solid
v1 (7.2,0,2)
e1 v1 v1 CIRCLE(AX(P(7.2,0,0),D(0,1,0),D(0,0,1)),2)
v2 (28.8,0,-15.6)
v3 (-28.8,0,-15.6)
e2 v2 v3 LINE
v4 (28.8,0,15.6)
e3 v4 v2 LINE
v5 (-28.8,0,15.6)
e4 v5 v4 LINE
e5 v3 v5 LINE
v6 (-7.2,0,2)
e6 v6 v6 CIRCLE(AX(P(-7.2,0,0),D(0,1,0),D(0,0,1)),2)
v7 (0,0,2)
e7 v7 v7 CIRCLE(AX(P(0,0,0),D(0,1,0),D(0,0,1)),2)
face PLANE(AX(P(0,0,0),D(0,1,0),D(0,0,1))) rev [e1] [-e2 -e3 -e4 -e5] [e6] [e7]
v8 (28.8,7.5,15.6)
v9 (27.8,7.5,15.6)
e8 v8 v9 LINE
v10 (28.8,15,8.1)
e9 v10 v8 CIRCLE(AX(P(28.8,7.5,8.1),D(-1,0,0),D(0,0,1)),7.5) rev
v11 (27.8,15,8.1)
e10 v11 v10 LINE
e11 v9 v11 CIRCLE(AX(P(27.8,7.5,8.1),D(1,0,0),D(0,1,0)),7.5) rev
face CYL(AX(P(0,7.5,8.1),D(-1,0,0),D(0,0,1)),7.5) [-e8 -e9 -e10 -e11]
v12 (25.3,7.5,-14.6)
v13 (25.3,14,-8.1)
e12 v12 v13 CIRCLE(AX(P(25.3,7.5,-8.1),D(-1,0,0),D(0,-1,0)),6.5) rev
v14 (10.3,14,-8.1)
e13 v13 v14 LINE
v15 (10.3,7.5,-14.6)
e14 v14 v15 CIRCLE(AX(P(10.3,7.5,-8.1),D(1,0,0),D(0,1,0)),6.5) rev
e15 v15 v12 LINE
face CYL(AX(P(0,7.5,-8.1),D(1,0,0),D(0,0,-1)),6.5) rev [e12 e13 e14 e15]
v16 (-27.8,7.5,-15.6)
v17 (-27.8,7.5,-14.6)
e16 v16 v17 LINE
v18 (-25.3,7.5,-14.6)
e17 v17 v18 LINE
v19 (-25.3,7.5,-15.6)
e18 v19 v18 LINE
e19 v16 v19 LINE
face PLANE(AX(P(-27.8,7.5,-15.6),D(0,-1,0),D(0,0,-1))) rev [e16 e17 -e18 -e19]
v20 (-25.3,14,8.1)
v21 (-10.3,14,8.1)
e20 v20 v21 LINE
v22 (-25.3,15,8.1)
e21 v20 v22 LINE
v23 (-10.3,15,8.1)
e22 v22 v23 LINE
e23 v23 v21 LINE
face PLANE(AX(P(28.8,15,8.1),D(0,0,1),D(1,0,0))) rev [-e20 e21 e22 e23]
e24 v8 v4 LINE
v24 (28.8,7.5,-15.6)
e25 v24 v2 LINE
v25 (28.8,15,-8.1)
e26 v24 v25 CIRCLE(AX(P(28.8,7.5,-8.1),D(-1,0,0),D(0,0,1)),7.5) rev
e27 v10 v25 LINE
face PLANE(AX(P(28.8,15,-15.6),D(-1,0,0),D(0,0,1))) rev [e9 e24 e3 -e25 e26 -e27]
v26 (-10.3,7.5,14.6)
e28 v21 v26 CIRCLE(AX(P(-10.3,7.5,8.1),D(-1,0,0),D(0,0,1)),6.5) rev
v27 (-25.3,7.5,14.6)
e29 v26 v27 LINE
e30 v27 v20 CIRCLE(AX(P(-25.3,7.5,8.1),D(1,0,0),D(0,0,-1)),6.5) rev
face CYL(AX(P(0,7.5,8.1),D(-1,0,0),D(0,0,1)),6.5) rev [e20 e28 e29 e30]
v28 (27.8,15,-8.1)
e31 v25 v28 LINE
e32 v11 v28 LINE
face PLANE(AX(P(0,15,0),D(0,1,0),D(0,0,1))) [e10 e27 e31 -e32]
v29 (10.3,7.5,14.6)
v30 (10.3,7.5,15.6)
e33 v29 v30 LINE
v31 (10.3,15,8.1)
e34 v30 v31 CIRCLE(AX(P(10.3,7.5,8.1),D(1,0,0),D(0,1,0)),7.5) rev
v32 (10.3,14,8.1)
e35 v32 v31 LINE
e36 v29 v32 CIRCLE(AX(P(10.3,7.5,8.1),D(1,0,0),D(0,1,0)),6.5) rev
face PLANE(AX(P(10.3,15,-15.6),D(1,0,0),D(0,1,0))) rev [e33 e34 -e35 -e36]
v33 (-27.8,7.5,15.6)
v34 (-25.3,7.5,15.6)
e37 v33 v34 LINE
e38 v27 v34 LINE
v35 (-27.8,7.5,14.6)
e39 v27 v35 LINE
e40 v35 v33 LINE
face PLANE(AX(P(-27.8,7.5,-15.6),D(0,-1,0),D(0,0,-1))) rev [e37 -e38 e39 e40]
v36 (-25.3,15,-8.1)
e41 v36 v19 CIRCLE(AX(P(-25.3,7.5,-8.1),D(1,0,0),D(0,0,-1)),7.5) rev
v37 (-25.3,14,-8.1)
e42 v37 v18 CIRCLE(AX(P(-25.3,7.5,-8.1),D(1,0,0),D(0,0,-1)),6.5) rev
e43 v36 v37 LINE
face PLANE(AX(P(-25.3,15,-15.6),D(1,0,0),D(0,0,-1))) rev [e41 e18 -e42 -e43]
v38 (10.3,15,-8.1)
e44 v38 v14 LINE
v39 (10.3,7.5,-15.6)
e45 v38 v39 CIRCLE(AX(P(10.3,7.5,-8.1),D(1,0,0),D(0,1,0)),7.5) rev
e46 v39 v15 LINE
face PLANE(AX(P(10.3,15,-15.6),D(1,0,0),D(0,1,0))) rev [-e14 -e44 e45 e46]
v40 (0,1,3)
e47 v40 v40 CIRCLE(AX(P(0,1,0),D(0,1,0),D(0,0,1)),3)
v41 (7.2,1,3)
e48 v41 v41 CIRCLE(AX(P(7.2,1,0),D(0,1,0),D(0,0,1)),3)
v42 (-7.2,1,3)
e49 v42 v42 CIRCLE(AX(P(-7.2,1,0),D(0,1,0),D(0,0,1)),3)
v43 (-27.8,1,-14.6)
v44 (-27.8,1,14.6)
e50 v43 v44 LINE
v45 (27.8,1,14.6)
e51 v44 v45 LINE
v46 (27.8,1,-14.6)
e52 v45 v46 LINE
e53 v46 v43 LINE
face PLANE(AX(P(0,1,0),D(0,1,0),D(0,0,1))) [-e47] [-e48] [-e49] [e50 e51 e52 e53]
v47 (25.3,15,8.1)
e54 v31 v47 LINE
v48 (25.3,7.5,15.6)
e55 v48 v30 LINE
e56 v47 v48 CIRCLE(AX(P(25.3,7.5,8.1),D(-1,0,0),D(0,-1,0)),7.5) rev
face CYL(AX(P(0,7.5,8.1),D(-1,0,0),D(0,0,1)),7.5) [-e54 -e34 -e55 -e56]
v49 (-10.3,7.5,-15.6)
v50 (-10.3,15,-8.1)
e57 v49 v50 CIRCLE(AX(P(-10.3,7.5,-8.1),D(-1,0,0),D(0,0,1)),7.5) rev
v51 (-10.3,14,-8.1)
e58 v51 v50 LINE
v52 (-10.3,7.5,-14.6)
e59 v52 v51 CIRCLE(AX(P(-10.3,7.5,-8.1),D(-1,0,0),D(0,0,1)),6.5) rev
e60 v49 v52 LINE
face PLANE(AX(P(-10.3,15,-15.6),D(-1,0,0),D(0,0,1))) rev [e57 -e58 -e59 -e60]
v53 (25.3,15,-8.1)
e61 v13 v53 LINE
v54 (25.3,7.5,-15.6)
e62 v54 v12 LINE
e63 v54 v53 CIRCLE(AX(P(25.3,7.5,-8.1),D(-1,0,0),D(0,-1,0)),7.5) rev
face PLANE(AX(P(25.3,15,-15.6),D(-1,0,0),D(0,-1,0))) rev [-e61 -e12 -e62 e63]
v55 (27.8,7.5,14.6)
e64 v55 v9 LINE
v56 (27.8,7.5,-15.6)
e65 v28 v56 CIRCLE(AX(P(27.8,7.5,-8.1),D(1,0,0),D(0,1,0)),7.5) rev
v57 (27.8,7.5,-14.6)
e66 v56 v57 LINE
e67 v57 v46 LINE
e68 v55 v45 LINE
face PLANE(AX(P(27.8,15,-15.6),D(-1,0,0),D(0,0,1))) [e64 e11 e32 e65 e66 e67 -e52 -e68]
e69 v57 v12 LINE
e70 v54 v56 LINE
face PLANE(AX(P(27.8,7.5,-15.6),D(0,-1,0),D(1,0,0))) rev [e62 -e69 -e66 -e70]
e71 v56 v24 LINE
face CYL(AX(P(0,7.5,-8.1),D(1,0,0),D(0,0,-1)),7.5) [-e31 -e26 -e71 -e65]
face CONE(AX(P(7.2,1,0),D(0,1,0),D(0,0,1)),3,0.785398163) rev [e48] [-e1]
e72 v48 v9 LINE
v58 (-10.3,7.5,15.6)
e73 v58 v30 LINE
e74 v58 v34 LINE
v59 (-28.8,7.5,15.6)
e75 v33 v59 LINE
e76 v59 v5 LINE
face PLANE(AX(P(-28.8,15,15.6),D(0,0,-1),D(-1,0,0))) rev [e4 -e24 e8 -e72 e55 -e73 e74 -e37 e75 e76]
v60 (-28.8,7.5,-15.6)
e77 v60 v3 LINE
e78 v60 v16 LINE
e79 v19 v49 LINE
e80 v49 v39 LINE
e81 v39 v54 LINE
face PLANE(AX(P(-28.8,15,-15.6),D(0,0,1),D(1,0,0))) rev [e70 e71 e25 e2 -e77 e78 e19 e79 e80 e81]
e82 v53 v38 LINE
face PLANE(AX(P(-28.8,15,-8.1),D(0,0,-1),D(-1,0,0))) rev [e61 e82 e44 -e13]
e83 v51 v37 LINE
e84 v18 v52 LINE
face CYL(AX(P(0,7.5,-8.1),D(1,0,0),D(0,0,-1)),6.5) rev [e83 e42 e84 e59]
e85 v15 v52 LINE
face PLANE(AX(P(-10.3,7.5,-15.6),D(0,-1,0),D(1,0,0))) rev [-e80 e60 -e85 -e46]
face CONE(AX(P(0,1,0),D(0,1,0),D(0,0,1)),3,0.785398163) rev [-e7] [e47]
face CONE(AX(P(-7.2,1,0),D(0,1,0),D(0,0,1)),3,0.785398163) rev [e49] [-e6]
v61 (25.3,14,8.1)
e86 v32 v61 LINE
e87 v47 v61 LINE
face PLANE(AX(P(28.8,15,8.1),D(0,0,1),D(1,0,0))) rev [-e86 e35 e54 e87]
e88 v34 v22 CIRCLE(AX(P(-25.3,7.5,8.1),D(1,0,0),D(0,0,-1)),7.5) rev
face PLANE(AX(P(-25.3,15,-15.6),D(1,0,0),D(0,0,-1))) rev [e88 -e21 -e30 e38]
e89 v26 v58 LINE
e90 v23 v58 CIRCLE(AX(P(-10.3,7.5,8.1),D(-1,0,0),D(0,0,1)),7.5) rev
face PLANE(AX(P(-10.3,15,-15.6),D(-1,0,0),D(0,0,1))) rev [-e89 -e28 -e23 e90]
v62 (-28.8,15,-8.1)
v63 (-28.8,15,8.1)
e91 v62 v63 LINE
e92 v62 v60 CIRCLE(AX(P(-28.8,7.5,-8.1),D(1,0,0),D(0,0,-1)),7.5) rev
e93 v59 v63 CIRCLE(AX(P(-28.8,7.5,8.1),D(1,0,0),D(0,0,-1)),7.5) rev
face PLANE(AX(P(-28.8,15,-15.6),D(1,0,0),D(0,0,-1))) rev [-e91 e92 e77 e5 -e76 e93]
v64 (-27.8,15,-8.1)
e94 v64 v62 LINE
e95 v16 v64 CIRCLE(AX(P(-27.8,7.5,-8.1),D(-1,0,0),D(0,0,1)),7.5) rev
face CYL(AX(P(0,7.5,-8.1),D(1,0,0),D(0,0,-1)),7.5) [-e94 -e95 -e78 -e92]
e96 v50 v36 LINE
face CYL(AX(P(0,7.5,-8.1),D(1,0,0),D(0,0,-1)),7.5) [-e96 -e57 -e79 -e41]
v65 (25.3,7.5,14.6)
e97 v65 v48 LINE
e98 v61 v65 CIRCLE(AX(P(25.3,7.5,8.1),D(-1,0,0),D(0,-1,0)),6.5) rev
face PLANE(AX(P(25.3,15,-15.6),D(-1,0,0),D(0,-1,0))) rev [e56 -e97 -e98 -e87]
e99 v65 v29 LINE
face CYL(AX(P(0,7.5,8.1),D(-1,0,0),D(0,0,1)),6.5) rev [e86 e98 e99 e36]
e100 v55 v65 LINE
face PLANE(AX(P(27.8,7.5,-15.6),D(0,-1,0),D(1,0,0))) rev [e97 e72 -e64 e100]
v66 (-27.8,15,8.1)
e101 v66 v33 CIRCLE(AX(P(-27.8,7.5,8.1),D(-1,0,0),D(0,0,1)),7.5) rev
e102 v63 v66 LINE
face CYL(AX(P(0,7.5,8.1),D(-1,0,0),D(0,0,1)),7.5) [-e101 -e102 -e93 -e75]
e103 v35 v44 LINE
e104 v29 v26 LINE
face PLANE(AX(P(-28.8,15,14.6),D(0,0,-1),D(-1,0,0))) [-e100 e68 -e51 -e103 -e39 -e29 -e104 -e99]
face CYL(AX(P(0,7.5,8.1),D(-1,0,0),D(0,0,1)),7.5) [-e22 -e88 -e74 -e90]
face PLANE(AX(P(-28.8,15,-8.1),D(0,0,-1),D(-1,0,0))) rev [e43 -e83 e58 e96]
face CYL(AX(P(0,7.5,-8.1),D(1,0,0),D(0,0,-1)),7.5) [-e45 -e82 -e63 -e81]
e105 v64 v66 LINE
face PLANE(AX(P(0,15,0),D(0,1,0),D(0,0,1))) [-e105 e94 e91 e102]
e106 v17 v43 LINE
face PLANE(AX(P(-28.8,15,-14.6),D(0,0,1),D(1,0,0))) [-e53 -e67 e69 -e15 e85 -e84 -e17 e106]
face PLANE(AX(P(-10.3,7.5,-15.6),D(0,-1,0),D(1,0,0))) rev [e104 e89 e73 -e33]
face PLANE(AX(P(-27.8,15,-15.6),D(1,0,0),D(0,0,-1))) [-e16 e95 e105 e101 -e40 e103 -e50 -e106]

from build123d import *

# Parameters (mm, degrees)
SKETCH1_W                   = 57.6
SKETCH1_H                   = 31.2
BOSS_EXTRUDE1_DEPTH         = 15
FILLET1_R                   = 7.5
SHELL1_START                = -27.8
SHELL1_DEPTH                = 55.6
SKETCH4_W                   = 2.5
SKETCH4_H                   = 7.5
SKETCH4_W_2                 = 20.6
CUT_EXTRUDE1_DEPTH          = 46.03198863
SKETCH5_R                   = 1.4
CUT_EXTRUDE2_DEPTH          = 15
M3_TAPPED_HOLE1_D           = 2.5
M3_TAPPED_HOLE1_DEPTH       = 16
M3_TAPPED_HOLE1_CSINK_D     = 6
M3_TAPPED_HOLE1_CSINK_ANGLE = 90
M3_TAPPED_HOLE1_TIP         = 0.751075774


# Read off the part's stored shape, not the designer's step: Shell1
with BuildPart() as part:
    # Sketch1 → Boss-Extrude1 (new body)
    with BuildSketch(Plane(origin=(0, 0, 0), x_dir=(1, 0, 0), z_dir=(0, 1, 0))):
        Rectangle(SKETCH1_W, SKETCH1_H)
    extrude(amount=BOSS_EXTRUDE1_DEPTH)

    # Fillet1
    fillet1_edges = [part.edges().sort_by_distance(p)[0] for p in [
        (0, 15, 15.6),
        (0, 15, -15.6),
    ]]
    fillet(fillet1_edges, radius=FILLET1_R)

    # Shell1 outline → Shell1 (cut)
    with BuildSketch(Plane.YZ.offset(SHELL1_START)):
        with BuildLine():
            Line((15, -8.1), (15, 8.1))
            Line((15, 8.1), (14, 8.1))
            ThreePointArc((14, 8.1), (12.096194078, 12.696194078), (7.5, 14.6))
            Line((7.5, 14.6), (1, 14.6))
            Line((1, 14.6), (1, -14.6))
            Line((1, -14.6), (7.5, -14.6))
            ThreePointArc((7.5, -14.6), (12.096194078, -12.696194078), (14, -8.1))
            Line((14, -8.1), (15, -8.1))
        make_face()
    extrude(amount=SHELL1_DEPTH, mode=Mode.SUBTRACT)

    # Sketch4 → Cut-Extrude1 (cut, through all)
    with BuildSketch(Plane.XY.offset(15.6)):
        with Locations((-26.55, 11.25)):
            Rectangle(SKETCH4_W, SKETCH4_H)
        with Locations((0, 11.25)):
            Rectangle(SKETCH4_W_2, SKETCH4_H)
        with Locations((26.55, 11.25)):
            Rectangle(SKETCH4_W, SKETCH4_H)
    extrude(amount=-CUT_EXTRUDE1_DEPTH, mode=Mode.SUBTRACT)

    # Sketch5 → Cut-Extrude2 (cut)
    with BuildSketch(Plane(origin=(0, 1, 0), x_dir=(1, 0, 0), z_dir=(0, 1, 0))):
        with Locations(Location((0, 0, 0), (0, 0, 270))):
            Circle(SKETCH5_R)
        with Locations(Location((7.2, 0, 0), (0, 0, 270))):
            Circle(SKETCH5_R)
        with Locations(Location((-7.2, 0, 0), (0, 0, 270))):
            Circle(SKETCH5_R)
    extrude(amount=-CUT_EXTRUDE2_DEPTH, mode=Mode.SUBTRACT)

    # M3 Tapped Hole1
    with Locations(Plane(origin=(0, 1, 31.4), x_dir=(1, 0, 0), z_dir=(0, 1, 0))):
        with Locations((7.2, 31.4), (0, 31.4), (-7.2, 31.4)):
            CounterSinkHole(M3_TAPPED_HOLE1_D / 2, M3_TAPPED_HOLE1_CSINK_D / 2, depth=M3_TAPPED_HOLE1_DEPTH, counter_sink_angle=M3_TAPPED_HOLE1_CSINK_ANGLE)
            with Locations((0, 0, -(M3_TAPPED_HOLE1_DEPTH + M3_TAPPED_HOLE1_TIP / 2))):  # 118° drill point
                Cone(0, M3_TAPPED_HOLE1_D / 2, M3_TAPPED_HOLE1_TIP, mode=Mode.SUBTRACT)


solid = part.part
